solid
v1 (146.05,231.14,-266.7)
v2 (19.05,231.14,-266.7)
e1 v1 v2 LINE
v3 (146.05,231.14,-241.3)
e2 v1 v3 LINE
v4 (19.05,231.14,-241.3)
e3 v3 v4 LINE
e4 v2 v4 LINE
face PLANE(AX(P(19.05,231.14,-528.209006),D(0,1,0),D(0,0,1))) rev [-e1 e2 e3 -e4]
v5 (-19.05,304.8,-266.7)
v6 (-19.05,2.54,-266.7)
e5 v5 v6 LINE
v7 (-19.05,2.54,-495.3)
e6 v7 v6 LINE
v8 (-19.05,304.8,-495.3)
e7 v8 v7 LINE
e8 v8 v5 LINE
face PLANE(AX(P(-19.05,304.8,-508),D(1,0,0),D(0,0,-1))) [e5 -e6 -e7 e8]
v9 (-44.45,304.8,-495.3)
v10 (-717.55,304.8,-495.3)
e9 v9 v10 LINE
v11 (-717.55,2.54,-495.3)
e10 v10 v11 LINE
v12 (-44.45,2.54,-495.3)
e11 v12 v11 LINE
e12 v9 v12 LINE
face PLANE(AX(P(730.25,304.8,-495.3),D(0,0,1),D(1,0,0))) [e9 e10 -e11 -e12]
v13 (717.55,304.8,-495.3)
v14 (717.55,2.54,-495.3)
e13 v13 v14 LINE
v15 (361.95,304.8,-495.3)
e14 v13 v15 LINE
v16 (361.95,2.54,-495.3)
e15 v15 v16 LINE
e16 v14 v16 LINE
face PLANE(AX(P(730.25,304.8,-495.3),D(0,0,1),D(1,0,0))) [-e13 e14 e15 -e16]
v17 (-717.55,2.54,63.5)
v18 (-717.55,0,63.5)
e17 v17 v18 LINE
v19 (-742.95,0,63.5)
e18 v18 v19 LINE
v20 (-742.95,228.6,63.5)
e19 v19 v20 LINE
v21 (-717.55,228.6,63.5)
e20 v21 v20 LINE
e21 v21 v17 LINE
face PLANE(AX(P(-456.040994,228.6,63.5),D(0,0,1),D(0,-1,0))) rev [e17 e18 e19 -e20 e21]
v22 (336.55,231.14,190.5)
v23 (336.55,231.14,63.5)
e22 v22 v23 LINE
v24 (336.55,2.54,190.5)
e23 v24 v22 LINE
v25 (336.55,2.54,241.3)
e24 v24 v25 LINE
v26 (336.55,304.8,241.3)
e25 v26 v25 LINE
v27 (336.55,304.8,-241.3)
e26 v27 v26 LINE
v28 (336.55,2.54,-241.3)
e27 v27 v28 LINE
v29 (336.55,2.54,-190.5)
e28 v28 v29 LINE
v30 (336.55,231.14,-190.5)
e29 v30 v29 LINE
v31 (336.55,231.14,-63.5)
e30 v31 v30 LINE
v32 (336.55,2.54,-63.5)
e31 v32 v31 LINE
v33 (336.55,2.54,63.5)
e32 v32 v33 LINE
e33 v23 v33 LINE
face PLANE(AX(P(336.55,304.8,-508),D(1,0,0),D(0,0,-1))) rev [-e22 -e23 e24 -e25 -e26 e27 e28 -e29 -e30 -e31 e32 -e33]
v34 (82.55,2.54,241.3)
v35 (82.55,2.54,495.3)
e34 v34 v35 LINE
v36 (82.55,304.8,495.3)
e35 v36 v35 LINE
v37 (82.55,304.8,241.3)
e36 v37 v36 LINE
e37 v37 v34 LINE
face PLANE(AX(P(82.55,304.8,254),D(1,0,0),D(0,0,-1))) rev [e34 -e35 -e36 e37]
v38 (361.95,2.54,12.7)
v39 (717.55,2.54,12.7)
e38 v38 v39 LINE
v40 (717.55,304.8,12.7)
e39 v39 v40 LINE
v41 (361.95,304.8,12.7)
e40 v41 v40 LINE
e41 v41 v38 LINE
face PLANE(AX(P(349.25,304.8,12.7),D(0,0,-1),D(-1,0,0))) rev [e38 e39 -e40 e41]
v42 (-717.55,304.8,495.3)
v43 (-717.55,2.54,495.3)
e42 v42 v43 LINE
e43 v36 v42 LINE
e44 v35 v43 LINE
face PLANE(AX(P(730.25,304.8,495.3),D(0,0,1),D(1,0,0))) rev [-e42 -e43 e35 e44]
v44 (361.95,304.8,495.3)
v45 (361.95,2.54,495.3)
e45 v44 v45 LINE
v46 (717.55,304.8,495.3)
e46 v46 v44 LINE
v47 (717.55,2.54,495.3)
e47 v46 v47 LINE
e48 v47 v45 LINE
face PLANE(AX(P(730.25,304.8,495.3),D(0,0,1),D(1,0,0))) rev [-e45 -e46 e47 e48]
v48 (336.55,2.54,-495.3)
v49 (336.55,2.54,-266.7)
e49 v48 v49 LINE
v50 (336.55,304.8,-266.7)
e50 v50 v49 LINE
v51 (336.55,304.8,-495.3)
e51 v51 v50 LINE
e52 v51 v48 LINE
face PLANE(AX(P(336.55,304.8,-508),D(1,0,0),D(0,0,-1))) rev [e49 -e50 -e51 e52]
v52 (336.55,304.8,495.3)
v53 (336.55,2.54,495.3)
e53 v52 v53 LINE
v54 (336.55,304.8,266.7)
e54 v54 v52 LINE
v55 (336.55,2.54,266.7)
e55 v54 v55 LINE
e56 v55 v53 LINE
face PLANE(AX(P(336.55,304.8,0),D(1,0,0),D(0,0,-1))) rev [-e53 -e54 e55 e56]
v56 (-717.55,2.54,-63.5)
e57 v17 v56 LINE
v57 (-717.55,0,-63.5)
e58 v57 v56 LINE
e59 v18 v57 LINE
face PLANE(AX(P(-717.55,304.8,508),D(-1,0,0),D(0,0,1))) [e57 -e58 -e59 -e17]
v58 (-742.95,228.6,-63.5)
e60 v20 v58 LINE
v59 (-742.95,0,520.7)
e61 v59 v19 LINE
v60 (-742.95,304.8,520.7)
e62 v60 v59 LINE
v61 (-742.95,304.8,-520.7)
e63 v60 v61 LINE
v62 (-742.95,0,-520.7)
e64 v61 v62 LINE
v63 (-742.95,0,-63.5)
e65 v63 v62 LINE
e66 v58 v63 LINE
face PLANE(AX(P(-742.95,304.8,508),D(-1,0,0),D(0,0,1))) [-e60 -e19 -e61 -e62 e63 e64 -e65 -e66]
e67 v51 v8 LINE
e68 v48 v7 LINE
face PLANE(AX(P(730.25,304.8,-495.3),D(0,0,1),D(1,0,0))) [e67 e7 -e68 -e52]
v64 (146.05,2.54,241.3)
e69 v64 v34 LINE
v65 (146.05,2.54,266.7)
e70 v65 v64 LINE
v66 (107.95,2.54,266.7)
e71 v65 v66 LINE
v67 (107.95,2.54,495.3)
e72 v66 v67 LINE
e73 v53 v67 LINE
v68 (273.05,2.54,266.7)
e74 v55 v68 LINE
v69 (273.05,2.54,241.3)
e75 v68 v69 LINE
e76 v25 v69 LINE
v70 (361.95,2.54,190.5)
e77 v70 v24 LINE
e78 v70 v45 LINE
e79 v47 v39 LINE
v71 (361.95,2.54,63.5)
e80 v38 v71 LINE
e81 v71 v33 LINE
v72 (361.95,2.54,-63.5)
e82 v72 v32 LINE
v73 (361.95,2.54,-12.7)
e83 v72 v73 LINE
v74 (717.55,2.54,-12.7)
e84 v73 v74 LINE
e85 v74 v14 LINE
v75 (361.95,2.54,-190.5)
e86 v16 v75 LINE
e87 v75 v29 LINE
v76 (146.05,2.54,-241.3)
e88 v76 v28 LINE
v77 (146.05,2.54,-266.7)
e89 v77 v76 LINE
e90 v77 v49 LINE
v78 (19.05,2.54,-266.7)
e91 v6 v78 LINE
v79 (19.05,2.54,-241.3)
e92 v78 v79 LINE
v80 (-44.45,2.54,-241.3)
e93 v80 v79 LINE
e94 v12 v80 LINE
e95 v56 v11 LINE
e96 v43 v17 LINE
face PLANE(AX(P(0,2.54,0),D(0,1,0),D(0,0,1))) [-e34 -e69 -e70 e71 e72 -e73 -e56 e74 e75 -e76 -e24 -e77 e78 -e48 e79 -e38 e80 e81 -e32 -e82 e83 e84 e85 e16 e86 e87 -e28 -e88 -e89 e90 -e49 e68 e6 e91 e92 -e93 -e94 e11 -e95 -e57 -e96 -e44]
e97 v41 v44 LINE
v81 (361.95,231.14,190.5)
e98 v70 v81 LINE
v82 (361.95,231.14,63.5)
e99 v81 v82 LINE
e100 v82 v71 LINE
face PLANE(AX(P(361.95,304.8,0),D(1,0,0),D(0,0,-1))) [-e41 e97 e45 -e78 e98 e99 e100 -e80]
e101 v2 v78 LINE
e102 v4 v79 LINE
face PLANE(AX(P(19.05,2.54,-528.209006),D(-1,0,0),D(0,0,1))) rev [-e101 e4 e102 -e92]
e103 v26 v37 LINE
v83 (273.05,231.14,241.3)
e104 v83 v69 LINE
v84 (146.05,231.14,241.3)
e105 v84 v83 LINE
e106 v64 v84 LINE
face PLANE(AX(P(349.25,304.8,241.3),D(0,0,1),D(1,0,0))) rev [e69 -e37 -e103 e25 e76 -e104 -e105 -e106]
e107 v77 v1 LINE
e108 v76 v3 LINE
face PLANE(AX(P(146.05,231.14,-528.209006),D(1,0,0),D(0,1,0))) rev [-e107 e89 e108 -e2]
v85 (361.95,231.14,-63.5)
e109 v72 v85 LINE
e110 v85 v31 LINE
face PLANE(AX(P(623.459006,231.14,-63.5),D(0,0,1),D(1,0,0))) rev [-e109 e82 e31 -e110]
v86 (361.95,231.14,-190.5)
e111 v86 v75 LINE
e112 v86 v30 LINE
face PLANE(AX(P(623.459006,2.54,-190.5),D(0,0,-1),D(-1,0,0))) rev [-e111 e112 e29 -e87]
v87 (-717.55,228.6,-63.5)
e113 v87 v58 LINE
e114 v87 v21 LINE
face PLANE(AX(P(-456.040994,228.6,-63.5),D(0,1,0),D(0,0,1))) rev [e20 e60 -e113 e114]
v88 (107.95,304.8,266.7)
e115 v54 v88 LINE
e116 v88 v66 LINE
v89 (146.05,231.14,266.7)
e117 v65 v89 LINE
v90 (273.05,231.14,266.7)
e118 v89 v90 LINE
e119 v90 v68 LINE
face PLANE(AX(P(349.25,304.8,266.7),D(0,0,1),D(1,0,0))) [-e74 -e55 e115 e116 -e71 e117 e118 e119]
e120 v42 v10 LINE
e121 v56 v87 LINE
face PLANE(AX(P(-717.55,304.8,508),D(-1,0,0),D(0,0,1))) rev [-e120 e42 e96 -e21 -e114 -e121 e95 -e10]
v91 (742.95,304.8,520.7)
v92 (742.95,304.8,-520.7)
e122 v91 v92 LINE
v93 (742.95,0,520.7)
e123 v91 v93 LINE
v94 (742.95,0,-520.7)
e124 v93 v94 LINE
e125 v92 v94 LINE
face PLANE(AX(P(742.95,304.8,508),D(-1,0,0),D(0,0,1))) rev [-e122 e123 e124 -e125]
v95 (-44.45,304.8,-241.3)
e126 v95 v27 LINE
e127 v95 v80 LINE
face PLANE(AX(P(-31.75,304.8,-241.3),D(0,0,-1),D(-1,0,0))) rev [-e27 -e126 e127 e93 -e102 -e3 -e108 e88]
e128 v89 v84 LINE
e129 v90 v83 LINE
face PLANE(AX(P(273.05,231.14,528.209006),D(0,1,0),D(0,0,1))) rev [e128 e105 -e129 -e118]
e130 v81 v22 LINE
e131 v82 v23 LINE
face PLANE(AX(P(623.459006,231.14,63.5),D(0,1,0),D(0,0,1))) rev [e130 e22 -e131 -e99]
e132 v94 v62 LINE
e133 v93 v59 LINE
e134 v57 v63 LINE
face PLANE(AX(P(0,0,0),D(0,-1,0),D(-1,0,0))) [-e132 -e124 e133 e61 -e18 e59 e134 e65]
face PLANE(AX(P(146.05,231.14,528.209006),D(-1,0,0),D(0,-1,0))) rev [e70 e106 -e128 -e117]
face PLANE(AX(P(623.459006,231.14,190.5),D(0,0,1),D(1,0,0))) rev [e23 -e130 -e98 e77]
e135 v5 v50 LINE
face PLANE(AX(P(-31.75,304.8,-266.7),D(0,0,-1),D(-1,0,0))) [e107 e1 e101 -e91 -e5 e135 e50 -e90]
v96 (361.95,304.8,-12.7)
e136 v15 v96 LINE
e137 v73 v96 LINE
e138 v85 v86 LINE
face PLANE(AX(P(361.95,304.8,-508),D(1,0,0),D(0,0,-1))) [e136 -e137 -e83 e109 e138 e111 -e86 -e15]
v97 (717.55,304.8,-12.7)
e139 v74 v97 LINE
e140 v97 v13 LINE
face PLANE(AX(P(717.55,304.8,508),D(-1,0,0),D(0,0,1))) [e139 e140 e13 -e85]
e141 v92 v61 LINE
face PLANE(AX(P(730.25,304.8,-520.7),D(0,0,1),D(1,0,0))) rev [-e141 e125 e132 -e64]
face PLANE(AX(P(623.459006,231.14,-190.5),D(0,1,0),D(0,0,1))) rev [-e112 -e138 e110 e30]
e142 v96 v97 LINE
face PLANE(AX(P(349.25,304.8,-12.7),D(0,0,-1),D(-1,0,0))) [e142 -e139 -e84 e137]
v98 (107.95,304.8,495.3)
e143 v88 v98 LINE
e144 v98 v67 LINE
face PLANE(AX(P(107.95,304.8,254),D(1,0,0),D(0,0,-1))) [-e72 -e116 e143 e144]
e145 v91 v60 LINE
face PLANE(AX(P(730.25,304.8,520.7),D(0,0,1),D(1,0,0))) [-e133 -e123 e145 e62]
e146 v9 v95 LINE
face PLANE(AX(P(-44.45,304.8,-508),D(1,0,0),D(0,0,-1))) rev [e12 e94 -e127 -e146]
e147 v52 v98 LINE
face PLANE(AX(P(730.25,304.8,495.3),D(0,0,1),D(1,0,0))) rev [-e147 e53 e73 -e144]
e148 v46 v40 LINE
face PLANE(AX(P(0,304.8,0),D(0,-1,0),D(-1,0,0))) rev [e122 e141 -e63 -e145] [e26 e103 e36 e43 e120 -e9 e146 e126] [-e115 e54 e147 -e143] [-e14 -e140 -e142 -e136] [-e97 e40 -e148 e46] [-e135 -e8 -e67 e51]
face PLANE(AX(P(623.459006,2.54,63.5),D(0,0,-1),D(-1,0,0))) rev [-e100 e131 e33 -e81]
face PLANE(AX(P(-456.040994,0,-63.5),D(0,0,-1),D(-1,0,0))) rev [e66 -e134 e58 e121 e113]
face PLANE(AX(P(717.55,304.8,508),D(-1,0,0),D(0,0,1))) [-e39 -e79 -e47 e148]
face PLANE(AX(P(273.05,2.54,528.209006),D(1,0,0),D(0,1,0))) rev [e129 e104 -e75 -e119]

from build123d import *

# Parameters (mm, degrees)
EXTRUDE_THIN1_OUTLINE_W   = 1485.9
EXTRUDE_THIN1_OUTLINE_H   = 1041.4
EXTRUDE_THIN1_OUTLINE_W_2 = 228.6
EXTRUDE_THIN1_OUTLINE_H_2 = 228.6
EXTRUDE_THIN1_OUTLINE_W_3 = 355.6
EXTRUDE_THIN1_OUTLINE_H_3 = 482.6
EXTRUDE_THIN1_DEPTH       = 304.8
SKETCH1_5_W               = 1460.5
SKETCH1_5_H               = 1016
BOSS_EXTRUDE1_DEPTH       = 2.54
CUT_EXTRUDE1_DEPTH        = 25.4
SKETCH4_W                 = 127
SKETCH4_H                 = 228.6
CUT_EXTRUDE2_DEPTH        = 25.4
SKETCH5_W                 = 127
SKETCH5_H                 = 228.6
CUT_EXTRUDE3_DEPTH        = 25.4
SKETCH6_W                 = 127
SKETCH6_H                 = 228.6
CUT_EXTRUDE4_DEPTH        = 25.4


# Read off the part's stored shape, not the designer's step: Extrude-Thin1
with BuildPart() as part:
    # Extrude-Thin1 outline → Extrude-Thin1 (new body)
    with BuildSketch(Plane(origin=(0, 0, 0), x_dir=(1, 0, 0), z_dir=(0, 1, 0))):
        Rectangle(EXTRUDE_THIN1_OUTLINE_W, EXTRUDE_THIN1_OUTLINE_H)
        with Locations((222.25, -381)):
            Rectangle(EXTRUDE_THIN1_OUTLINE_W_2, EXTRUDE_THIN1_OUTLINE_H_2, mode=Mode.SUBTRACT)
        with Locations((539.75, -254)):
            Rectangle(EXTRUDE_THIN1_OUTLINE_W_3, EXTRUDE_THIN1_OUTLINE_H_3, mode=Mode.SUBTRACT)
        Polygon((-44.45, 495.3), (-44.45, 241.3), (336.55, 241.3), (336.55, -241.3), (82.55, -241.3), (82.55, -495.3), (-717.55, -495.3), (-717.55, 495.3), align=None, mode=Mode.SUBTRACT)
        with Locations((539.75, 254)):
            Rectangle(EXTRUDE_THIN1_OUTLINE_W_3, EXTRUDE_THIN1_OUTLINE_H_3, mode=Mode.SUBTRACT)
        with Locations((158.75, 381)):
            Rectangle(EXTRUDE_THIN1_OUTLINE_W_3, EXTRUDE_THIN1_OUTLINE_H_2, mode=Mode.SUBTRACT)
    extrude(amount=EXTRUDE_THIN1_DEPTH)

    # Sketch1<5> → Boss-Extrude1 (add)
    with BuildSketch(Plane(origin=(0, 0, 0), x_dir=(1, 0, 0), z_dir=(0, 1, 0))):
        Rectangle(SKETCH1_5_W, SKETCH1_5_H)
    extrude(amount=BOSS_EXTRUDE1_DEPTH)

    # Sketch2 → Cut-Extrude1 (cut)
    with BuildSketch(Plane.ZY.offset(742.95)):
        Polygon((-63.5, 0), (-63.5, 228.6), (63.5, 228.6), (63.5, 0), (0, 0), align=None)
    extrude(amount=-CUT_EXTRUDE1_DEPTH, mode=Mode.SUBTRACT)

    # Sketch4 → Cut-Extrude2 (cut)
    with BuildSketch(Plane.ZY.offset(-336.55)):
        with Locations((-127, 116.84)):
            Rectangle(SKETCH4_W, SKETCH4_H)
        with Locations((127, 116.84)):
            Rectangle(SKETCH4_W, SKETCH4_H)
    extrude(amount=-CUT_EXTRUDE2_DEPTH, mode=Mode.SUBTRACT)

    # Sketch5 → Cut-Extrude3 (cut)
    with BuildSketch(Plane(origin=(0, 0, 241.3), x_dir=(-1, 0, 0), z_dir=(0, 0, -1))):
        with Locations((-209.55, 116.84)):
            Rectangle(SKETCH5_W, SKETCH5_H)
    extrude(amount=-CUT_EXTRUDE3_DEPTH, mode=Mode.SUBTRACT)

    # Sketch6 → Cut-Extrude4 (cut)
    with BuildSketch(Plane.XY.offset(-241.3)):
        with Locations((82.55, 116.84)):
            Rectangle(SKETCH6_W, SKETCH6_H)
    extrude(amount=-CUT_EXTRUDE4_DEPTH, mode=Mode.SUBTRACT)


solid = part.part
